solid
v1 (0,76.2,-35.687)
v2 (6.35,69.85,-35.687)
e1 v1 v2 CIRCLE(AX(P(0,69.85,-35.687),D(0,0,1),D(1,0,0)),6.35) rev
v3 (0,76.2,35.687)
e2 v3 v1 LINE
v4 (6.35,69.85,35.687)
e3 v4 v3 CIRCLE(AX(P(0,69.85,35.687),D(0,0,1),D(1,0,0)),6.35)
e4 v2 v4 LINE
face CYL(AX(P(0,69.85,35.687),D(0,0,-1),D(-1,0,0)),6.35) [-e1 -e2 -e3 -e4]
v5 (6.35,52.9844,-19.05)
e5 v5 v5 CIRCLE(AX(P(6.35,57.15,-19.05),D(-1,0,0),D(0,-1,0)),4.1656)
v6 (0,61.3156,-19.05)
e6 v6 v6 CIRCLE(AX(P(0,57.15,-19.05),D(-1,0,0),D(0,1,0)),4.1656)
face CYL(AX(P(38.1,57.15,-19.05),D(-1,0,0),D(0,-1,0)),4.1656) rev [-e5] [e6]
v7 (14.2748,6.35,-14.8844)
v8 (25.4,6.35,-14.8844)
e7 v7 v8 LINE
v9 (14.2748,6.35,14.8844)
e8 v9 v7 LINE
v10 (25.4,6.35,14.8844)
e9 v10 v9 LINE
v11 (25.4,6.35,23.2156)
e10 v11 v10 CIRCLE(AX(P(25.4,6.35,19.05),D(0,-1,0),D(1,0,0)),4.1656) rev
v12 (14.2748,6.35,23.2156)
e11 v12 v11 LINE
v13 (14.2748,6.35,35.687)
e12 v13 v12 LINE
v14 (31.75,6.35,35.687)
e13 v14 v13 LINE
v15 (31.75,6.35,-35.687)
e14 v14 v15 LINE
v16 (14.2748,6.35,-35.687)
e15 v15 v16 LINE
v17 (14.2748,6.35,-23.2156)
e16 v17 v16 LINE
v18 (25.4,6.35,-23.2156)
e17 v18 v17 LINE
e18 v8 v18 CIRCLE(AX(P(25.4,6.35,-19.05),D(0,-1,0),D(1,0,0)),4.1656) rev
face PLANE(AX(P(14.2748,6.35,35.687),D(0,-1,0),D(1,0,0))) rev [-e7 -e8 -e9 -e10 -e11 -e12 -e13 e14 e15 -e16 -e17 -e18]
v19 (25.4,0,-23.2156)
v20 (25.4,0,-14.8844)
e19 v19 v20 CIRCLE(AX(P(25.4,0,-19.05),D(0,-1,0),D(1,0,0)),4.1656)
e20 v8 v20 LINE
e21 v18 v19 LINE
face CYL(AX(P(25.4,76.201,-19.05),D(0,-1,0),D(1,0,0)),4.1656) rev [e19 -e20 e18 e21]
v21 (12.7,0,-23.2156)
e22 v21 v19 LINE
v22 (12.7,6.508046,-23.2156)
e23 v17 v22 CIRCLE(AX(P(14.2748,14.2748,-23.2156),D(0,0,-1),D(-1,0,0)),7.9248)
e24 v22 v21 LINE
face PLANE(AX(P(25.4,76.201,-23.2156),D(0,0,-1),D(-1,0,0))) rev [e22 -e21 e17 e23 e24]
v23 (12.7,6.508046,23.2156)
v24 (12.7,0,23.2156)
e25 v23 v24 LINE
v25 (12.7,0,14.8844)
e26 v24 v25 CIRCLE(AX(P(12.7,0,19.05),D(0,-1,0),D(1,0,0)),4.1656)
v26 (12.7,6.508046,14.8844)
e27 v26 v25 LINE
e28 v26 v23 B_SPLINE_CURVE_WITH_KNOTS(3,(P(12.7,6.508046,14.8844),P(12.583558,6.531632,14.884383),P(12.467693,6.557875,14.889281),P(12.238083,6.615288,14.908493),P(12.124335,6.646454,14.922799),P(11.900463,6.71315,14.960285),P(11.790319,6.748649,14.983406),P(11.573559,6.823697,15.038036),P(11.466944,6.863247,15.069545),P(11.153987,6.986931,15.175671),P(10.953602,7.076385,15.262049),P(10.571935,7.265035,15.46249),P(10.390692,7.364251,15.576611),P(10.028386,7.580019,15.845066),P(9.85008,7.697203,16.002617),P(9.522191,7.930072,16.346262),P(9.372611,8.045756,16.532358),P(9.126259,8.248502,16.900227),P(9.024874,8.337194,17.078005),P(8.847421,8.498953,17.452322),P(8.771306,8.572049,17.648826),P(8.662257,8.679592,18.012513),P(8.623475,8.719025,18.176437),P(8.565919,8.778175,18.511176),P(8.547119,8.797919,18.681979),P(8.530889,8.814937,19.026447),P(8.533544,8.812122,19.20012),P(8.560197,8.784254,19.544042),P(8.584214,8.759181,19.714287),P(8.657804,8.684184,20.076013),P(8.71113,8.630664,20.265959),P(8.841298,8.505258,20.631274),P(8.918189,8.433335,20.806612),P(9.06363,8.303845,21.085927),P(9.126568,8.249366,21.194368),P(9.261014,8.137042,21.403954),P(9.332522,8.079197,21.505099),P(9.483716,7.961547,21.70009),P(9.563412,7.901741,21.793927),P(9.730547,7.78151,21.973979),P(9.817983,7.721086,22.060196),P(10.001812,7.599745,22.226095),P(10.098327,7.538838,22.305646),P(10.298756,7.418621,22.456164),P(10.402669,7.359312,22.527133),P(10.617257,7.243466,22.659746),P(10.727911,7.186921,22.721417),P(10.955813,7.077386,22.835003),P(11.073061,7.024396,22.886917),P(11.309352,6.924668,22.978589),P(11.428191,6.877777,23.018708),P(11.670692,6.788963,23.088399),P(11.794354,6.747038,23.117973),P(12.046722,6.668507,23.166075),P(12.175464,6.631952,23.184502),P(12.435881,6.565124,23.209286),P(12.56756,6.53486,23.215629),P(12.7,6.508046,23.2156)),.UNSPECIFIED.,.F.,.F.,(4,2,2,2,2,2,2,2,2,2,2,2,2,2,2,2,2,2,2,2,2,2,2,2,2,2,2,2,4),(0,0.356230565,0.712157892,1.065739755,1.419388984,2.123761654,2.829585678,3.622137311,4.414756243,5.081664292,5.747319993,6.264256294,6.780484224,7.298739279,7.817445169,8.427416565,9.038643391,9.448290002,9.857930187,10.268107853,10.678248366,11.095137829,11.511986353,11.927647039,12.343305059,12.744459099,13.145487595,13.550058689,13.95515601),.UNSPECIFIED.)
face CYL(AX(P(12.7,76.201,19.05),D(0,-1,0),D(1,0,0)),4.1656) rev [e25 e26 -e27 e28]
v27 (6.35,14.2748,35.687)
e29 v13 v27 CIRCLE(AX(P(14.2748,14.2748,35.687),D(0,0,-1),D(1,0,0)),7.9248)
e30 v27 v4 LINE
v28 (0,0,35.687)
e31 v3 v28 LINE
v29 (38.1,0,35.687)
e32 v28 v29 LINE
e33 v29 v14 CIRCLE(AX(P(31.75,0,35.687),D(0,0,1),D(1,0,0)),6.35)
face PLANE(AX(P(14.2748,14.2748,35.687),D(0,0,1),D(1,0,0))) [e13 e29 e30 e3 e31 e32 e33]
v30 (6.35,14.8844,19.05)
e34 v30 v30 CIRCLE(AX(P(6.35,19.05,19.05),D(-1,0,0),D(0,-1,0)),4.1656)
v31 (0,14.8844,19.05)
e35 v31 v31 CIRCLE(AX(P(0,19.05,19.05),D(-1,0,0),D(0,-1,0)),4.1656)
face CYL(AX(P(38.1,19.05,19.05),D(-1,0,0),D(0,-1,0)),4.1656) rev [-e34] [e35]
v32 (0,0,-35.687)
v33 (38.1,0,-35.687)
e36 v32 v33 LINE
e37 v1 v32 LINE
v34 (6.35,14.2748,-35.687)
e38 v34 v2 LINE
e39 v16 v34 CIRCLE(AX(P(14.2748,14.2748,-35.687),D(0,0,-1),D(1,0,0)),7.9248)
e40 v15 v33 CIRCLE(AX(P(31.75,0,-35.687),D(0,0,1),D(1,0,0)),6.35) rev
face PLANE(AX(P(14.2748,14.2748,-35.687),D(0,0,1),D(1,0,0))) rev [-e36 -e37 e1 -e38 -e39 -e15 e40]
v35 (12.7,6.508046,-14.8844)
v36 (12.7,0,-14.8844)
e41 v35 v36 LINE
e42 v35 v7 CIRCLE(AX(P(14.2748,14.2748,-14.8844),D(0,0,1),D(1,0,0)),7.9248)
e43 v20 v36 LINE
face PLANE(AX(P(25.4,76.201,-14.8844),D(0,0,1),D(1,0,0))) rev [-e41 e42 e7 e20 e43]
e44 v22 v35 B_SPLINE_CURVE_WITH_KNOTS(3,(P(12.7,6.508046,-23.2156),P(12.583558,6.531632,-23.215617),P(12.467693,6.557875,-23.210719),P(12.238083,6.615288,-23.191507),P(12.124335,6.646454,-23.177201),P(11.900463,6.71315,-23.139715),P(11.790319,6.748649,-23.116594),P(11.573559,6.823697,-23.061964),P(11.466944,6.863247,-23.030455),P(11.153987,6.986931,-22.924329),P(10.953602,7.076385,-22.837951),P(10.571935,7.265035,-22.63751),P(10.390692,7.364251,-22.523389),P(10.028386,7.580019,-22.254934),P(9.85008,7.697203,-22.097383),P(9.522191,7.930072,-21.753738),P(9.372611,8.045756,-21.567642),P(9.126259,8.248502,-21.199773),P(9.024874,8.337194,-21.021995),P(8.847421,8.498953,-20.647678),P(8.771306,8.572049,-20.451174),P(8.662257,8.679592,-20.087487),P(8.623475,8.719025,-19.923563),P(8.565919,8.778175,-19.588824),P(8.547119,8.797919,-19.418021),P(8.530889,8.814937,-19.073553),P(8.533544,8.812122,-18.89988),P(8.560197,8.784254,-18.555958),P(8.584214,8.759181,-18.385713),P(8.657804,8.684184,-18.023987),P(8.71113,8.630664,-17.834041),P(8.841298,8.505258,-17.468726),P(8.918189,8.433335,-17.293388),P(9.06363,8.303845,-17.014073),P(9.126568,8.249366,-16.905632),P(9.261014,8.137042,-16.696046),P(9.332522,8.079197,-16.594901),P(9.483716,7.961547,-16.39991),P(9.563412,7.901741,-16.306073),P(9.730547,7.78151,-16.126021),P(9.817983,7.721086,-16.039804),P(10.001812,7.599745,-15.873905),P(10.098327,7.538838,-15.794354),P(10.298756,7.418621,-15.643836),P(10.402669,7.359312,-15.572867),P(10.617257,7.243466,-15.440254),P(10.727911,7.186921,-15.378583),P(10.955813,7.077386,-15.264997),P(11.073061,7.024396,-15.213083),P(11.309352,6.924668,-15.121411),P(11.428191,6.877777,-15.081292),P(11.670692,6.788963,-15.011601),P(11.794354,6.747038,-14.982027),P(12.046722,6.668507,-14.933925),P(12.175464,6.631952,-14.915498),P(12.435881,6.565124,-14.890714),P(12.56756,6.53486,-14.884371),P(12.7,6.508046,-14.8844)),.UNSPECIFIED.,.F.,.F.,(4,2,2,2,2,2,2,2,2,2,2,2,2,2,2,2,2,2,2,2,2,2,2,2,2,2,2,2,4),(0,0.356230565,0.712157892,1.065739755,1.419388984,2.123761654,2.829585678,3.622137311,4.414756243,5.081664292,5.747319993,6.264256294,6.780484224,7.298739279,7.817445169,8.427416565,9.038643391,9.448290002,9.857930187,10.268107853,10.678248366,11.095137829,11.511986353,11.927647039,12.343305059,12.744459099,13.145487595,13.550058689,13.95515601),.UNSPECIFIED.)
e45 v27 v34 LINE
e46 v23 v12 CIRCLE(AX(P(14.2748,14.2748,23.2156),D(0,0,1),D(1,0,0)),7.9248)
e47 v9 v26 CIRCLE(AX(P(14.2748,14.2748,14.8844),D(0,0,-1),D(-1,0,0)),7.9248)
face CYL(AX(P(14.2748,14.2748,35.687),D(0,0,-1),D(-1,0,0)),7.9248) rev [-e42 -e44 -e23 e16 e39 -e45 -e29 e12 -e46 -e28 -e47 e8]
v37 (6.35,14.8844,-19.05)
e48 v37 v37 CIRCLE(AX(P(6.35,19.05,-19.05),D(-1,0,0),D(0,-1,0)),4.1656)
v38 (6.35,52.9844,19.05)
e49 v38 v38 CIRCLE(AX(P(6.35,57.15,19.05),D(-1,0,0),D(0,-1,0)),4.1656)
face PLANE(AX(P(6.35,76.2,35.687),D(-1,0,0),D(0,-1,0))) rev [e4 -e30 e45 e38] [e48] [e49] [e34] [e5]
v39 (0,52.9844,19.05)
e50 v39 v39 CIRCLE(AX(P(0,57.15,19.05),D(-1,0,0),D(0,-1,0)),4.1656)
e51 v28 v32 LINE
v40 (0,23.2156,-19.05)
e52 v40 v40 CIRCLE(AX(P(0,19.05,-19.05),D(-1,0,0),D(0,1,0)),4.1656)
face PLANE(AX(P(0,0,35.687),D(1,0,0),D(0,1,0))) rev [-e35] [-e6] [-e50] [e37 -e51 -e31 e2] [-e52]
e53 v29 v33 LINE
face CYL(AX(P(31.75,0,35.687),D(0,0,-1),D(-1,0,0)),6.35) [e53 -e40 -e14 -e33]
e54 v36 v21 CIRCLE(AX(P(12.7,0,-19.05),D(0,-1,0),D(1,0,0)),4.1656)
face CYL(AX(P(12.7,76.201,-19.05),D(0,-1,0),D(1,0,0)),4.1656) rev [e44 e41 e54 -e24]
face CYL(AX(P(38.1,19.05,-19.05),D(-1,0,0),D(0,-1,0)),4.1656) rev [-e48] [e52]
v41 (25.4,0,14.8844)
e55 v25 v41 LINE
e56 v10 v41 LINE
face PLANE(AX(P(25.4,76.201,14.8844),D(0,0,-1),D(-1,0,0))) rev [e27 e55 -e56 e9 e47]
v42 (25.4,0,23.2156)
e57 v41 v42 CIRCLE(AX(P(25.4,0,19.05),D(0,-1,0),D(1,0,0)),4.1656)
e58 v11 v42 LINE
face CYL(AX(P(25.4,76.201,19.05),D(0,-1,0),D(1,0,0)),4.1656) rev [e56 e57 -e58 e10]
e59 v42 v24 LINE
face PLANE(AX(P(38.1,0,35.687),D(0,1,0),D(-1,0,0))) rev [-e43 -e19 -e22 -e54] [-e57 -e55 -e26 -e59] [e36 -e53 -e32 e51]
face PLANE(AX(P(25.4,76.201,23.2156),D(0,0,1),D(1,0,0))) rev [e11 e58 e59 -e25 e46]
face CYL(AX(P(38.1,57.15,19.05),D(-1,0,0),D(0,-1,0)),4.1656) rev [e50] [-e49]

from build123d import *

# Parameters (mm, degrees)
BOSS_EXTRUDE1_DEPTH = 35.687
FILLET1_R           = 6.35
CUT_EXTRUDE1_REACH  = 94.367
SKETCH4_R           = 4.1656
CUT_EXTRUDE2_DEPTH  = 93.366725481


with BuildPart() as part:
    # Sketch2 → Boss-Extrude1 (new, symmetric)
    with BuildSketch(Plane.XY):
        with BuildLine():
            Line((0, 0), (0, 76.2))
            Line((0, 76.2), (6.35, 76.2))
            Line((6.35, 76.2), (6.35, 14.2748))
            ThreePointArc((6.35, 14.2748), (8.67112018, 8.67112018), (14.2748, 6.35))
            Line((14.2748, 6.35), (38.1, 6.35))
            Line((38.1, 6.35), (38.1, 0))
            Line((38.1, 0), (0, 0))
        make_face()
    extrude(amount=BOSS_EXTRUDE1_DEPTH, both=True)

    # Fillet1
    fillet1_edges = [part.edges().sort_by_distance(p)[0] for p in [
        (38.1, 6.35, 0),
        (6.35, 76.2, 0),
    ]]
    fillet(fillet1_edges, radius=FILLET1_R - 0.0001)  # a hair under: the kernel refuses the full size

    # Sketch3 → Cut-Extrude1 (cut, up to next)
    with BuildSketch(Plane.XZ, mode=Mode.PRIVATE) as cut_extrude1_sk1:
        with BuildLine():
            Line((25.4, 14.8844), (12.7, 14.8844))
            ThreePointArc((12.7, 14.8844), (8.5344, 19.05), (12.7, 23.2156))
            Line((12.7, 23.2156), (25.4, 23.2156))
            ThreePointArc((25.4, 23.2156), (29.5656, 19.05), (25.4, 14.8844))
        make_face()
    cut_extrude1_tool1 = extrude(cut_extrude1_sk1.sketch, amount=-CUT_EXTRUDE1_REACH, mode=Mode.PRIVATE) & part.part
    # Sketch3 → Cut-Extrude1 (cut, up to next)
    with BuildSketch(Plane.XZ, mode=Mode.PRIVATE) as cut_extrude1_sk2:
        with BuildLine():
            Line((25.4, -23.2156), (12.7, -23.2156))
            ThreePointArc((12.7, -23.2156), (8.5344, -19.05), (12.7, -14.8844))
            Line((12.7, -14.8844), (25.4, -14.8844))
            ThreePointArc((25.4, -14.8844), (29.5656, -19.05), (25.4, -23.2156))
        make_face()
    cut_extrude1_tool2 = extrude(cut_extrude1_sk2.sketch, amount=-CUT_EXTRUDE1_REACH, mode=Mode.PRIVATE) & part.part
    add(cut_extrude1_tool1.solids().sort_by_distance((19.05, 0, 19.05))[0], mode=Mode.SUBTRACT)
    add(cut_extrude1_tool2.solids().sort_by_distance((19.05, 0, -19.05))[0], mode=Mode.SUBTRACT)

    # Sketch4 → Cut-Extrude2 (cut, through all)
    with BuildSketch(Plane.ZY):
        with Locations(Location((19.05, 57.15, 0), (0, 0, 270))):
            Circle(SKETCH4_R)
        with Locations(Location((-19.05, 19.05, 0), (0, 0, 270))):
            Circle(SKETCH4_R)
        with Locations(Location((-19.05, 57.15, 0), (0, 0, 270))):
            Circle(SKETCH4_R)
        with Locations(Location((19.05, 19.05, 0), (0, 0, 270))):
            Circle(SKETCH4_R)
    extrude(amount=-CUT_EXTRUDE2_DEPTH, mode=Mode.SUBTRACT)


solid = part.part
